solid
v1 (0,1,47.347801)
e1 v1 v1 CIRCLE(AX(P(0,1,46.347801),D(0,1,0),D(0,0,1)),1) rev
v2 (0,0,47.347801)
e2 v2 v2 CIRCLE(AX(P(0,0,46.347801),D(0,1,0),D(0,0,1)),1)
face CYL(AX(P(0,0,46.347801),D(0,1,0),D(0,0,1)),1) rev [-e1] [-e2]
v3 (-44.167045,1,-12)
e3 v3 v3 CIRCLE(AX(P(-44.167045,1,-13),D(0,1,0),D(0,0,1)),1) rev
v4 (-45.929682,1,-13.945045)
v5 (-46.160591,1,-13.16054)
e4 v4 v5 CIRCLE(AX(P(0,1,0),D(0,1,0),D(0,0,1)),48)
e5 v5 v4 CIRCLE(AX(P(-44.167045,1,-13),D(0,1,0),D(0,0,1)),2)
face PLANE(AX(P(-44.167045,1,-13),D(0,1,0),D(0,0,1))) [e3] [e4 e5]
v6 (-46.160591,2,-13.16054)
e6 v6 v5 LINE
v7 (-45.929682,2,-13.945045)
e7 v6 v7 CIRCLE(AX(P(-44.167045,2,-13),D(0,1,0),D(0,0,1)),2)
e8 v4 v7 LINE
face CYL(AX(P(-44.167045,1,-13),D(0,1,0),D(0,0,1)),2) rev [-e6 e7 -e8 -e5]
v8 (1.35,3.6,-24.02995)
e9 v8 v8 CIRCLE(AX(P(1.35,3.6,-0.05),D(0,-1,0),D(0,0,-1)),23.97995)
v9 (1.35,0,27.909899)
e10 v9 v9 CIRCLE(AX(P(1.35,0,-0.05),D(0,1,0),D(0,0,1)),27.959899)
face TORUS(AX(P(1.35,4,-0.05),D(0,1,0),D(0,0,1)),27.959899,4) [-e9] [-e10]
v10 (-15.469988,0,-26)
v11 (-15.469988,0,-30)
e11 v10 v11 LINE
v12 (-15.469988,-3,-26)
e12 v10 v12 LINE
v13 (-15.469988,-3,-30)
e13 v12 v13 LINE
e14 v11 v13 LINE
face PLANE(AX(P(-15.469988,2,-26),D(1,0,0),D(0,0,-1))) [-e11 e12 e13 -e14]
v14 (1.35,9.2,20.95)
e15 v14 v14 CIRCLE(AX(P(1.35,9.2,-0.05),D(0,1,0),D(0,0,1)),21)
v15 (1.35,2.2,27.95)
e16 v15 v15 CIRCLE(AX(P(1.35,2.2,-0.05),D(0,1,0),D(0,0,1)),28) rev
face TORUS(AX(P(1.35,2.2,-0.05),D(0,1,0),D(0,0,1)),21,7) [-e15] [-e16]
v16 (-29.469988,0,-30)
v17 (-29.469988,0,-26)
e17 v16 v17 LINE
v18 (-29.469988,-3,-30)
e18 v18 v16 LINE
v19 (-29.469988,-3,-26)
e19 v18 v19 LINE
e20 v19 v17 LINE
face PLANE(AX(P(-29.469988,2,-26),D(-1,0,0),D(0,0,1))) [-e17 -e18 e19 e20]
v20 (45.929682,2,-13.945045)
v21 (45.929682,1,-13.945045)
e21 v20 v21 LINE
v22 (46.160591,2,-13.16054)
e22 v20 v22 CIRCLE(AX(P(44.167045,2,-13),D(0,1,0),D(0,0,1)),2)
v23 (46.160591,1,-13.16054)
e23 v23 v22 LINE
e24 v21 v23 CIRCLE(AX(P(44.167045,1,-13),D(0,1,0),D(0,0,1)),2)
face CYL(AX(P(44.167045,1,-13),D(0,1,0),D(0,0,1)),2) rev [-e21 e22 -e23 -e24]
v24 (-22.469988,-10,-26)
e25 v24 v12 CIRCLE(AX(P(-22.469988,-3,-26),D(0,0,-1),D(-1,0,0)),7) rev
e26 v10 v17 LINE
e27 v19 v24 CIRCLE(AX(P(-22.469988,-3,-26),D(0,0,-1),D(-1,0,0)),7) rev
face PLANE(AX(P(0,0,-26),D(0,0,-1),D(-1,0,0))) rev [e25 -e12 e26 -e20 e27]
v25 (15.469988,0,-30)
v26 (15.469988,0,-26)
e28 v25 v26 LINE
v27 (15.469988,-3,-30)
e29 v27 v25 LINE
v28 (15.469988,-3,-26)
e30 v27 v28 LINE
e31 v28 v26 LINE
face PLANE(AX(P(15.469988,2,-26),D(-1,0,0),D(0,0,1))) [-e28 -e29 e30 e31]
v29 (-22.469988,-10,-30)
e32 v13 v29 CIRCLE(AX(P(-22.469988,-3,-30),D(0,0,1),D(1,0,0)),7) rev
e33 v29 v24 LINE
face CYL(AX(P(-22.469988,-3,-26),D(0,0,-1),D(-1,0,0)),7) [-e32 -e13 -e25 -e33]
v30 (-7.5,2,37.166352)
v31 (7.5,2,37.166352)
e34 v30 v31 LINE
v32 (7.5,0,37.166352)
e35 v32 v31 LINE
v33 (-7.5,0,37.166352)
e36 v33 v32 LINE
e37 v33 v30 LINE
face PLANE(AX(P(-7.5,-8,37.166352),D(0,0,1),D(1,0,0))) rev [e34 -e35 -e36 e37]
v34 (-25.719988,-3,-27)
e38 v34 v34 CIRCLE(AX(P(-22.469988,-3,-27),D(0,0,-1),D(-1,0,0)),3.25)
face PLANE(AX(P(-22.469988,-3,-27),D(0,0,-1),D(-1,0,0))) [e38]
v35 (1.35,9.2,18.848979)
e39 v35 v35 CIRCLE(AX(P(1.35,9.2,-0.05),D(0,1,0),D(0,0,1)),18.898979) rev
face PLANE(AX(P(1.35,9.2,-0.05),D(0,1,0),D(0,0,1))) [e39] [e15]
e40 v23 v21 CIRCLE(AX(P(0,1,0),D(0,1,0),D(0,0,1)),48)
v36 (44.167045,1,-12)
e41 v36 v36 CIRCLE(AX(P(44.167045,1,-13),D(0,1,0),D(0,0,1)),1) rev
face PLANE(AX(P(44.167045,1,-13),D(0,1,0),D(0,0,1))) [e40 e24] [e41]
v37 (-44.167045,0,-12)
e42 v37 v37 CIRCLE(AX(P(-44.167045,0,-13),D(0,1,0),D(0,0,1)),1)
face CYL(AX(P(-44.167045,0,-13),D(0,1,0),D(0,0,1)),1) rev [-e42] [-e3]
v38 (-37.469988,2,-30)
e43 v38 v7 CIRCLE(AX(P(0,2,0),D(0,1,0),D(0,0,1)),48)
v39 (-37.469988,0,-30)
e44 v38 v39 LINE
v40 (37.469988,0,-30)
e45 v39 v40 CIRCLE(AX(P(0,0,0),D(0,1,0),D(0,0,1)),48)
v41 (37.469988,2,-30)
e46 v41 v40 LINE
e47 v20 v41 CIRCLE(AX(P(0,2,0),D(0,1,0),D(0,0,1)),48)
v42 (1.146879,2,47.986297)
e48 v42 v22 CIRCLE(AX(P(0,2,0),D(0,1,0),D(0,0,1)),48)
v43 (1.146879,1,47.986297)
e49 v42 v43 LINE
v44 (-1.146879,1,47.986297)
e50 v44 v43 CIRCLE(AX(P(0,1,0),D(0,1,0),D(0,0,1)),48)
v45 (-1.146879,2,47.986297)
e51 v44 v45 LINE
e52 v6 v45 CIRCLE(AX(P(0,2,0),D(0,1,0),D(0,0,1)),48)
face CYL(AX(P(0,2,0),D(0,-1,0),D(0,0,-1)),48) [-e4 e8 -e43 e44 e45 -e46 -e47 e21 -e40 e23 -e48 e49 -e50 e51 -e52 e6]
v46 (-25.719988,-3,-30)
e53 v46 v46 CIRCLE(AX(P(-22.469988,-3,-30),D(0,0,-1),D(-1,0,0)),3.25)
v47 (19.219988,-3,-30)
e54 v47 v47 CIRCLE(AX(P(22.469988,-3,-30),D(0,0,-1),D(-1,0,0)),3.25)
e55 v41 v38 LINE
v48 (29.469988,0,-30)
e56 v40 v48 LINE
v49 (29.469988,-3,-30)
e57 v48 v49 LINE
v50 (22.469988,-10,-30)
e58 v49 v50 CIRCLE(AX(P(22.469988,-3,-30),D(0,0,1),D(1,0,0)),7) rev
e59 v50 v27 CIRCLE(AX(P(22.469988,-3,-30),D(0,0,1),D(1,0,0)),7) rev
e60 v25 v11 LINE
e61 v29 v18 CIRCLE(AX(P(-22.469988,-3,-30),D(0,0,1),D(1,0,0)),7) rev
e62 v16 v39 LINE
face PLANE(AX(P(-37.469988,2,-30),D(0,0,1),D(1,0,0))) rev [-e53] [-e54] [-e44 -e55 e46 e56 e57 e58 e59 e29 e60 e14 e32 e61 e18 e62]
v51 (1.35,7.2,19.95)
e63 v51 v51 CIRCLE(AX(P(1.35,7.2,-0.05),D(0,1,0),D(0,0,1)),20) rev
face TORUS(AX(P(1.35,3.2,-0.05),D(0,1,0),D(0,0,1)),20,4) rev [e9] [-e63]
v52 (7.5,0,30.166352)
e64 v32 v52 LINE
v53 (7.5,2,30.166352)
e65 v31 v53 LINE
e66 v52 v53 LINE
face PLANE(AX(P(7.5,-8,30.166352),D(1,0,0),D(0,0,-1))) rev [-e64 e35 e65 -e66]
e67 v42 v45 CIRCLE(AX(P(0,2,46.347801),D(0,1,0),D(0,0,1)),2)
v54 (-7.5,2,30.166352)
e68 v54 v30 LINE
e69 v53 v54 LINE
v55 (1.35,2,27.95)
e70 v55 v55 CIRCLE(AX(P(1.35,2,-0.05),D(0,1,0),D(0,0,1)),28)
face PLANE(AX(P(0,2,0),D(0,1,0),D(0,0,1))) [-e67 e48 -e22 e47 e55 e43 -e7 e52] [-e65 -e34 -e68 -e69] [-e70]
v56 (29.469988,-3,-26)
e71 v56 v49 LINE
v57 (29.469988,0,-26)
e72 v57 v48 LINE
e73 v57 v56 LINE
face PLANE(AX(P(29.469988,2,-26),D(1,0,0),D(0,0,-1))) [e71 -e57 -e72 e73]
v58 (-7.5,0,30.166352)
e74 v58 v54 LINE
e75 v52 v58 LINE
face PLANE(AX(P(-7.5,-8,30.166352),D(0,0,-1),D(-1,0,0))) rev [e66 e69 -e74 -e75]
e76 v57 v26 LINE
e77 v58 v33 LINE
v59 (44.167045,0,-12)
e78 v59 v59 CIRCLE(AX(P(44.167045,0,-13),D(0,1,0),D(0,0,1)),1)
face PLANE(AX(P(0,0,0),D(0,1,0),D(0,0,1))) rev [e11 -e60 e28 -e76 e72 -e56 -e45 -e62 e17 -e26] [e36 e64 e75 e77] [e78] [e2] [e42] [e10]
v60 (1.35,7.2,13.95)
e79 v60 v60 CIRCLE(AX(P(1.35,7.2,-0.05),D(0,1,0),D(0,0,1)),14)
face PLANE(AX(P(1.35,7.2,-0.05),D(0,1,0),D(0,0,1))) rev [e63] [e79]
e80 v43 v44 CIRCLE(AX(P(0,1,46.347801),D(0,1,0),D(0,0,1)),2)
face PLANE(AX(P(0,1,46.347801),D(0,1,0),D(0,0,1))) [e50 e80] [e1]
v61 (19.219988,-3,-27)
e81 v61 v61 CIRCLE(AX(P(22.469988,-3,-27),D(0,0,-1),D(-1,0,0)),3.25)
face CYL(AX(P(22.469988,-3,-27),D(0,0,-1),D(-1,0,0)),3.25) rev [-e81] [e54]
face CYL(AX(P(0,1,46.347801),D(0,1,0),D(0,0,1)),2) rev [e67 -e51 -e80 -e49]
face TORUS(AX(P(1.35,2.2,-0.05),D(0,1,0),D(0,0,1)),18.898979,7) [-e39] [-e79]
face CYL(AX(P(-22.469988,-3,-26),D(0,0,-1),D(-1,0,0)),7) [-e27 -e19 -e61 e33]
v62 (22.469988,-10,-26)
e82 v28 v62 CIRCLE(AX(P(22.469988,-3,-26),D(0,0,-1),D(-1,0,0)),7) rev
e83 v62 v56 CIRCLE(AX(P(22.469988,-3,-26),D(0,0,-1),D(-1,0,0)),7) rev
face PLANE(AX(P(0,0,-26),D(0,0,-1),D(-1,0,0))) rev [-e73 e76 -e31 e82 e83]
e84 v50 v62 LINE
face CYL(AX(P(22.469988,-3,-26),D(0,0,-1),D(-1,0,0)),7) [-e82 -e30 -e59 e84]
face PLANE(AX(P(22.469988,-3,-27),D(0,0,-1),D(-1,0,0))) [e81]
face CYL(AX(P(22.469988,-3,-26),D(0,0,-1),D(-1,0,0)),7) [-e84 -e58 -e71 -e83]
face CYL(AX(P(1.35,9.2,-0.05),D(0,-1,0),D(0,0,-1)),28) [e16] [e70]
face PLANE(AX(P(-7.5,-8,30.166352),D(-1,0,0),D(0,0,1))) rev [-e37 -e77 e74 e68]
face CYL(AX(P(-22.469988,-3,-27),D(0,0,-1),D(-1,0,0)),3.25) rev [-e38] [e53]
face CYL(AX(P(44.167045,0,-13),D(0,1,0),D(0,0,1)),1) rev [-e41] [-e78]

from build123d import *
from build123d.topology import SkipClean

# Parameters (mm, degrees)
BOSS_EXTRUDE1_DEPTH = 2
SKETCH4_R           = 1
CUT_EXTRUDE3_DEPTH  = 2
SKETCH5_R           = 2
CUT_EXTRUDE4_DEPTH  = 1
SKETCH2_R           = 5
CUT_EXTRUDE1_DEPTH  = 10
SKETCH3_R           = 24
CUT_EXTRUDE2_DEPTH  = 10
BOSS_EXTRUDE2_START = 7.2
SKETCH6_R           = 28
SKETCH6_R_2         = 24
BOSS_EXTRUDE2_DEPTH = 7.2
SKETCH7_R           = 28
SKETCH7_R_2         = 14
BOSS_EXTRUDE3_DEPTH = 2
SKETCH9_W           = 14
SKETCH9_H           = 12
BOSS_EXTRUDE4_DEPTH = 4
FILLET1_R           = 7
SKETCH10_R          = 3.25
CUT_EXTRUDE6_DEPTH  = 3
BOSS_EXTRUDE5_DEPTH = 2
FILLET2_R           = 7
FILLET3_R           = 7
FILLET4_R           = 4
FILLET5_R           = 4
SKETCH12_W          = 15
SKETCH12_H          = 7
CUT_EXTRUDE7_DEPTH  = 10


# Some blends are built 0.0001 mm under size
with BuildPart() as part:
    # Sketch1 → Boss-Extrude1 (new body)
    with BuildSketch(Plane(origin=(0, 0, 0), x_dir=(1, 0, 0), z_dir=(0, 1, 0))):
        with BuildLine():
            Line((-37.46998799, 30), (37.46998799, 30))
            ThreePointArc((37.46998799, 30), (0, -48), (-37.46998799, 30))
        make_face()
    extrude(amount=BOSS_EXTRUDE1_DEPTH)

    # Sketch4 → Cut-Extrude3 (cut)
    with BuildSketch(Plane(origin=(0, 2, 0), x_dir=(1, 0, 0), z_dir=(0, 1, 0))):
        with Locations(Location((-44.167045026, 13, 0), (0, 0, 270))):
            Circle(SKETCH4_R)
        with Locations(Location((0, -46.347801012, 0), (0, 0, 270))):
            Circle(SKETCH4_R)
        with Locations(Location((44.167045026, 13, 0), (0, 0, 270))):
            Circle(SKETCH4_R)
    extrude(amount=-CUT_EXTRUDE3_DEPTH, mode=Mode.SUBTRACT)

    # Sketch5 → Cut-Extrude4 (cut)
    with BuildSketch(Plane(origin=(0, 2, 0), x_dir=(1, 0, 0), z_dir=(0, 1, 0))):
        with Locations((-44.167045026, 13)):
            Circle(SKETCH5_R)
        with Locations((0, -46.347801012)):
            Circle(SKETCH5_R)
        with Locations((44.167045026, 13)):
            Circle(SKETCH5_R)
    extrude(amount=-CUT_EXTRUDE4_DEPTH, mode=Mode.SUBTRACT)

    # Sketch2 → Cut-Extrude1 (cut)
    with BuildSketch(Plane(origin=(0, 2, 0), x_dir=(1, 0, 0), z_dir=(0, 1, 0))):
        with Locations(Location((1.35, 0.05, 0), (0, 0, 270))):
            Circle(SKETCH2_R)
    extrude(amount=-CUT_EXTRUDE1_DEPTH, mode=Mode.SUBTRACT)

    # Sketch3 → Cut-Extrude2 (cut)
    with BuildSketch(Plane(origin=(0, 2, 0), x_dir=(1, 0, 0), z_dir=(0, 1, 0))):
        with Locations(Location((1.35, 0.05, 0), (0, 0, 270))):
            Circle(SKETCH3_R)
    extrude(amount=-CUT_EXTRUDE2_DEPTH, mode=Mode.SUBTRACT)

    # Sketch6 → Boss-Extrude2 (add)
    with BuildSketch(Plane(origin=(0, 2, 0), x_dir=(1, 0, 0), z_dir=(0, 1, 0)).offset(BOSS_EXTRUDE2_START)):
        with Locations(Location((1.35, 0.05, 0), (0, 0, 270))):
            Circle(SKETCH6_R)
        with Locations(Location((1.35, 0.05, 0), (0, 0, 270))):
            Circle(SKETCH6_R_2, mode=Mode.SUBTRACT)
    extrude(amount=-BOSS_EXTRUDE2_DEPTH)

    # Sketch7 → Boss-Extrude3 (add)
    with BuildSketch(Plane(origin=(0, 9.2, 0), x_dir=(1, 0, 0), z_dir=(0, 1, 0))):
        with Locations(Location((1.35, 0.05, 0), (0, 0, 270))):
            Circle(SKETCH7_R)
        with Locations(Location((1.35, 0.05, 0), (0, 0, 270))):
            Circle(SKETCH7_R_2, mode=Mode.SUBTRACT)
    extrude(amount=-BOSS_EXTRUDE3_DEPTH)

    # Sketch9 → Boss-Extrude4 (add)
    with BuildSketch(Plane(origin=(0, 0, -30), x_dir=(-1, 0, 0), z_dir=(0, 0, -1))):
        with Locations((-22.46998799, -4)):
            Rectangle(SKETCH9_W, SKETCH9_H)
        with Locations((22.46998799, -4)):
            Rectangle(SKETCH9_W, SKETCH9_H)
    extrude(amount=-BOSS_EXTRUDE4_DEPTH)

    # Fillet1
    fillet1_edges = [part.edges().sort_by_distance(p)[0] for p in [
        (-29.46998799, -10, -28),
        (-15.46998799, -10, -28),
        (15.46998799, -10, -28),
        (29.46998799, -10, -28),
    ]]
    fillet(fillet1_edges, radius=FILLET1_R - 0.0001)  # a hair under: the kernel refuses the full size

    # Sketch10 → Cut-Extrude6 (cut)
    with BuildSketch(Plane(origin=(0, 0, -30), x_dir=(-1, 0, 0), z_dir=(0, 0, -1))):
        with Locations((-22.46998799, -3)):
            Circle(SKETCH10_R)
        with Locations((22.46998799, -3)):
            Circle(SKETCH10_R)
    extrude(amount=-CUT_EXTRUDE6_DEPTH, mode=Mode.SUBTRACT)

    # Sketch11 → Boss-Extrude5 (add)
    with BuildSketch(Plane(origin=(0, 9.2, 0), x_dir=(1, 0, 0), z_dir=(0, 1, 0))):
        with BuildLine():
            Line((-8.65, 15.016629547), (-8.65, 9.847958971))
            ThreePointArc((-8.65, 9.847958971), (1.35, 14.05), (11.35, 9.847958971))
            Line((11.35, 9.847958971), (11.35, 15.016629547))
            ThreePointArc((11.35, 15.016629547), (1.35, 18.05), (-8.65, 15.016629547))
        make_face()
    extrude(amount=-BOSS_EXTRUDE5_DEPTH)

    # Fillet2
    fillet2_edges = [part.edges().sort_by_distance(p)[0] for p in [
        (1.35, 9.2, -28.05),
    ]]
    fillet(fillet2_edges, radius=FILLET2_R)

    # Fillet3
    # the kernel refuses this fillet: 7 mm, written as the material it takes off along each edge
    with BuildSketch(Plane(origin=(1.35, 9.2, -0.05), x_dir=(0, 0, 1), z_dir=(-1, 0, 0))) as fillet3_piece_1:
        with BuildLine():
            CenterArc((18.898979486, -7), FILLET3_R, 90, 44.415308597)
            Line((14, -2), (13.90202041, -1.9))
            ThreePointArc((13.90202041, -1.9), (13.86, -1), (13.86, 0))
            Line((13.86, 0), (14, 0.14))
            Line((14, 0.14), (18.898979486, 0.14))
            Line((18.898979486, 0.14), (18.898979486, 0))
        make_face()
    revolve(axis=Axis((1.35, 9.2, -0.05), (0, 1, 0)), revolution_arc=134.415308597, mode=Mode.SUBTRACT)
    with BuildSketch(Plane(origin=(1.35, 9.2, -0.05), x_dir=(-0.7142857142857139, 0, -0.6998542122237655), z_dir=(0.6998542122237655, 0, -0.7142857142857139))) as fillet3_piece_2:
        with BuildLine():
            CenterArc((18.898979486, -7), FILLET3_R, 90, 44.415308597)
            Line((14, -2), (13.90202041, -1.9))
            ThreePointArc((13.90202041, -1.9), (13.86, -1), (13.86, 0))
            Line((13.86, 0), (14, 0.14))
            Line((14, 0.14), (18.898979486, 0.14))
            Line((18.898979486, 0.14), (18.898979486, 0))
        make_face()
    revolve(axis=Axis((1.35, 9.2, -0.05), (0, 1, 0)), revolution_arc=134.415308597, mode=Mode.SUBTRACT)
    with BuildSketch(Plane(origin=(1.35, 9.2, -0.05), x_dir=(-0.7142857142857144, 0, -0.6998542122237652), z_dir=(-0.6998542122237652, 0, 0.7142857142857144))) as fillet3_piece_3:
        with BuildLine():
            CenterArc((18.898979486, 7), FILLET3_R, 225.584691403, 44.415308597)
            Line((14, 2), (13.90202041, 1.9))
            ThreePointArc((13.90202041, 1.9), (13.86, 1), (13.86, 0))
            Line((13.86, 0), (14, -0.14))
            Line((14, -0.14), (18.898979486, -0.14))
            Line((18.898979486, -0.14), (18.898979486, 0))
        make_face()
    revolve(axis=Axis((1.35, 9.2, -0.05), (0, -1, 0)), revolution_arc=91.169382806, mode=Mode.SUBTRACT)

    # Fillet4
    fillet4_edges = [part.edges().sort_by_distance(p)[0] for p in [
        (1.35, 7.2, -24.05),
    ]]
    fillet(fillet4_edges, radius=FILLET4_R)

    # Fillet5
    fillet5_edges = [part.edges().sort_by_distance(p)[0] for p in [
        (1.35, 0, -24.05),
    ]]
    fillet(fillet5_edges, radius=FILLET5_R)

    # Sketch12 → Cut-Extrude7 (cut)
    with SkipClean():  # the faces are left unmerged after this step: merging them gives an invalid solid
        with BuildSketch(Plane(origin=(0, 2, 0), x_dir=(1, 0, 0), z_dir=(0, 1, 0))):
            with Locations((0, -33.666351983)):
                Rectangle(SKETCH12_W, SKETCH12_H)
        extrude(amount=-CUT_EXTRUDE7_DEPTH, mode=Mode.SUBTRACT)


solid = part.part
